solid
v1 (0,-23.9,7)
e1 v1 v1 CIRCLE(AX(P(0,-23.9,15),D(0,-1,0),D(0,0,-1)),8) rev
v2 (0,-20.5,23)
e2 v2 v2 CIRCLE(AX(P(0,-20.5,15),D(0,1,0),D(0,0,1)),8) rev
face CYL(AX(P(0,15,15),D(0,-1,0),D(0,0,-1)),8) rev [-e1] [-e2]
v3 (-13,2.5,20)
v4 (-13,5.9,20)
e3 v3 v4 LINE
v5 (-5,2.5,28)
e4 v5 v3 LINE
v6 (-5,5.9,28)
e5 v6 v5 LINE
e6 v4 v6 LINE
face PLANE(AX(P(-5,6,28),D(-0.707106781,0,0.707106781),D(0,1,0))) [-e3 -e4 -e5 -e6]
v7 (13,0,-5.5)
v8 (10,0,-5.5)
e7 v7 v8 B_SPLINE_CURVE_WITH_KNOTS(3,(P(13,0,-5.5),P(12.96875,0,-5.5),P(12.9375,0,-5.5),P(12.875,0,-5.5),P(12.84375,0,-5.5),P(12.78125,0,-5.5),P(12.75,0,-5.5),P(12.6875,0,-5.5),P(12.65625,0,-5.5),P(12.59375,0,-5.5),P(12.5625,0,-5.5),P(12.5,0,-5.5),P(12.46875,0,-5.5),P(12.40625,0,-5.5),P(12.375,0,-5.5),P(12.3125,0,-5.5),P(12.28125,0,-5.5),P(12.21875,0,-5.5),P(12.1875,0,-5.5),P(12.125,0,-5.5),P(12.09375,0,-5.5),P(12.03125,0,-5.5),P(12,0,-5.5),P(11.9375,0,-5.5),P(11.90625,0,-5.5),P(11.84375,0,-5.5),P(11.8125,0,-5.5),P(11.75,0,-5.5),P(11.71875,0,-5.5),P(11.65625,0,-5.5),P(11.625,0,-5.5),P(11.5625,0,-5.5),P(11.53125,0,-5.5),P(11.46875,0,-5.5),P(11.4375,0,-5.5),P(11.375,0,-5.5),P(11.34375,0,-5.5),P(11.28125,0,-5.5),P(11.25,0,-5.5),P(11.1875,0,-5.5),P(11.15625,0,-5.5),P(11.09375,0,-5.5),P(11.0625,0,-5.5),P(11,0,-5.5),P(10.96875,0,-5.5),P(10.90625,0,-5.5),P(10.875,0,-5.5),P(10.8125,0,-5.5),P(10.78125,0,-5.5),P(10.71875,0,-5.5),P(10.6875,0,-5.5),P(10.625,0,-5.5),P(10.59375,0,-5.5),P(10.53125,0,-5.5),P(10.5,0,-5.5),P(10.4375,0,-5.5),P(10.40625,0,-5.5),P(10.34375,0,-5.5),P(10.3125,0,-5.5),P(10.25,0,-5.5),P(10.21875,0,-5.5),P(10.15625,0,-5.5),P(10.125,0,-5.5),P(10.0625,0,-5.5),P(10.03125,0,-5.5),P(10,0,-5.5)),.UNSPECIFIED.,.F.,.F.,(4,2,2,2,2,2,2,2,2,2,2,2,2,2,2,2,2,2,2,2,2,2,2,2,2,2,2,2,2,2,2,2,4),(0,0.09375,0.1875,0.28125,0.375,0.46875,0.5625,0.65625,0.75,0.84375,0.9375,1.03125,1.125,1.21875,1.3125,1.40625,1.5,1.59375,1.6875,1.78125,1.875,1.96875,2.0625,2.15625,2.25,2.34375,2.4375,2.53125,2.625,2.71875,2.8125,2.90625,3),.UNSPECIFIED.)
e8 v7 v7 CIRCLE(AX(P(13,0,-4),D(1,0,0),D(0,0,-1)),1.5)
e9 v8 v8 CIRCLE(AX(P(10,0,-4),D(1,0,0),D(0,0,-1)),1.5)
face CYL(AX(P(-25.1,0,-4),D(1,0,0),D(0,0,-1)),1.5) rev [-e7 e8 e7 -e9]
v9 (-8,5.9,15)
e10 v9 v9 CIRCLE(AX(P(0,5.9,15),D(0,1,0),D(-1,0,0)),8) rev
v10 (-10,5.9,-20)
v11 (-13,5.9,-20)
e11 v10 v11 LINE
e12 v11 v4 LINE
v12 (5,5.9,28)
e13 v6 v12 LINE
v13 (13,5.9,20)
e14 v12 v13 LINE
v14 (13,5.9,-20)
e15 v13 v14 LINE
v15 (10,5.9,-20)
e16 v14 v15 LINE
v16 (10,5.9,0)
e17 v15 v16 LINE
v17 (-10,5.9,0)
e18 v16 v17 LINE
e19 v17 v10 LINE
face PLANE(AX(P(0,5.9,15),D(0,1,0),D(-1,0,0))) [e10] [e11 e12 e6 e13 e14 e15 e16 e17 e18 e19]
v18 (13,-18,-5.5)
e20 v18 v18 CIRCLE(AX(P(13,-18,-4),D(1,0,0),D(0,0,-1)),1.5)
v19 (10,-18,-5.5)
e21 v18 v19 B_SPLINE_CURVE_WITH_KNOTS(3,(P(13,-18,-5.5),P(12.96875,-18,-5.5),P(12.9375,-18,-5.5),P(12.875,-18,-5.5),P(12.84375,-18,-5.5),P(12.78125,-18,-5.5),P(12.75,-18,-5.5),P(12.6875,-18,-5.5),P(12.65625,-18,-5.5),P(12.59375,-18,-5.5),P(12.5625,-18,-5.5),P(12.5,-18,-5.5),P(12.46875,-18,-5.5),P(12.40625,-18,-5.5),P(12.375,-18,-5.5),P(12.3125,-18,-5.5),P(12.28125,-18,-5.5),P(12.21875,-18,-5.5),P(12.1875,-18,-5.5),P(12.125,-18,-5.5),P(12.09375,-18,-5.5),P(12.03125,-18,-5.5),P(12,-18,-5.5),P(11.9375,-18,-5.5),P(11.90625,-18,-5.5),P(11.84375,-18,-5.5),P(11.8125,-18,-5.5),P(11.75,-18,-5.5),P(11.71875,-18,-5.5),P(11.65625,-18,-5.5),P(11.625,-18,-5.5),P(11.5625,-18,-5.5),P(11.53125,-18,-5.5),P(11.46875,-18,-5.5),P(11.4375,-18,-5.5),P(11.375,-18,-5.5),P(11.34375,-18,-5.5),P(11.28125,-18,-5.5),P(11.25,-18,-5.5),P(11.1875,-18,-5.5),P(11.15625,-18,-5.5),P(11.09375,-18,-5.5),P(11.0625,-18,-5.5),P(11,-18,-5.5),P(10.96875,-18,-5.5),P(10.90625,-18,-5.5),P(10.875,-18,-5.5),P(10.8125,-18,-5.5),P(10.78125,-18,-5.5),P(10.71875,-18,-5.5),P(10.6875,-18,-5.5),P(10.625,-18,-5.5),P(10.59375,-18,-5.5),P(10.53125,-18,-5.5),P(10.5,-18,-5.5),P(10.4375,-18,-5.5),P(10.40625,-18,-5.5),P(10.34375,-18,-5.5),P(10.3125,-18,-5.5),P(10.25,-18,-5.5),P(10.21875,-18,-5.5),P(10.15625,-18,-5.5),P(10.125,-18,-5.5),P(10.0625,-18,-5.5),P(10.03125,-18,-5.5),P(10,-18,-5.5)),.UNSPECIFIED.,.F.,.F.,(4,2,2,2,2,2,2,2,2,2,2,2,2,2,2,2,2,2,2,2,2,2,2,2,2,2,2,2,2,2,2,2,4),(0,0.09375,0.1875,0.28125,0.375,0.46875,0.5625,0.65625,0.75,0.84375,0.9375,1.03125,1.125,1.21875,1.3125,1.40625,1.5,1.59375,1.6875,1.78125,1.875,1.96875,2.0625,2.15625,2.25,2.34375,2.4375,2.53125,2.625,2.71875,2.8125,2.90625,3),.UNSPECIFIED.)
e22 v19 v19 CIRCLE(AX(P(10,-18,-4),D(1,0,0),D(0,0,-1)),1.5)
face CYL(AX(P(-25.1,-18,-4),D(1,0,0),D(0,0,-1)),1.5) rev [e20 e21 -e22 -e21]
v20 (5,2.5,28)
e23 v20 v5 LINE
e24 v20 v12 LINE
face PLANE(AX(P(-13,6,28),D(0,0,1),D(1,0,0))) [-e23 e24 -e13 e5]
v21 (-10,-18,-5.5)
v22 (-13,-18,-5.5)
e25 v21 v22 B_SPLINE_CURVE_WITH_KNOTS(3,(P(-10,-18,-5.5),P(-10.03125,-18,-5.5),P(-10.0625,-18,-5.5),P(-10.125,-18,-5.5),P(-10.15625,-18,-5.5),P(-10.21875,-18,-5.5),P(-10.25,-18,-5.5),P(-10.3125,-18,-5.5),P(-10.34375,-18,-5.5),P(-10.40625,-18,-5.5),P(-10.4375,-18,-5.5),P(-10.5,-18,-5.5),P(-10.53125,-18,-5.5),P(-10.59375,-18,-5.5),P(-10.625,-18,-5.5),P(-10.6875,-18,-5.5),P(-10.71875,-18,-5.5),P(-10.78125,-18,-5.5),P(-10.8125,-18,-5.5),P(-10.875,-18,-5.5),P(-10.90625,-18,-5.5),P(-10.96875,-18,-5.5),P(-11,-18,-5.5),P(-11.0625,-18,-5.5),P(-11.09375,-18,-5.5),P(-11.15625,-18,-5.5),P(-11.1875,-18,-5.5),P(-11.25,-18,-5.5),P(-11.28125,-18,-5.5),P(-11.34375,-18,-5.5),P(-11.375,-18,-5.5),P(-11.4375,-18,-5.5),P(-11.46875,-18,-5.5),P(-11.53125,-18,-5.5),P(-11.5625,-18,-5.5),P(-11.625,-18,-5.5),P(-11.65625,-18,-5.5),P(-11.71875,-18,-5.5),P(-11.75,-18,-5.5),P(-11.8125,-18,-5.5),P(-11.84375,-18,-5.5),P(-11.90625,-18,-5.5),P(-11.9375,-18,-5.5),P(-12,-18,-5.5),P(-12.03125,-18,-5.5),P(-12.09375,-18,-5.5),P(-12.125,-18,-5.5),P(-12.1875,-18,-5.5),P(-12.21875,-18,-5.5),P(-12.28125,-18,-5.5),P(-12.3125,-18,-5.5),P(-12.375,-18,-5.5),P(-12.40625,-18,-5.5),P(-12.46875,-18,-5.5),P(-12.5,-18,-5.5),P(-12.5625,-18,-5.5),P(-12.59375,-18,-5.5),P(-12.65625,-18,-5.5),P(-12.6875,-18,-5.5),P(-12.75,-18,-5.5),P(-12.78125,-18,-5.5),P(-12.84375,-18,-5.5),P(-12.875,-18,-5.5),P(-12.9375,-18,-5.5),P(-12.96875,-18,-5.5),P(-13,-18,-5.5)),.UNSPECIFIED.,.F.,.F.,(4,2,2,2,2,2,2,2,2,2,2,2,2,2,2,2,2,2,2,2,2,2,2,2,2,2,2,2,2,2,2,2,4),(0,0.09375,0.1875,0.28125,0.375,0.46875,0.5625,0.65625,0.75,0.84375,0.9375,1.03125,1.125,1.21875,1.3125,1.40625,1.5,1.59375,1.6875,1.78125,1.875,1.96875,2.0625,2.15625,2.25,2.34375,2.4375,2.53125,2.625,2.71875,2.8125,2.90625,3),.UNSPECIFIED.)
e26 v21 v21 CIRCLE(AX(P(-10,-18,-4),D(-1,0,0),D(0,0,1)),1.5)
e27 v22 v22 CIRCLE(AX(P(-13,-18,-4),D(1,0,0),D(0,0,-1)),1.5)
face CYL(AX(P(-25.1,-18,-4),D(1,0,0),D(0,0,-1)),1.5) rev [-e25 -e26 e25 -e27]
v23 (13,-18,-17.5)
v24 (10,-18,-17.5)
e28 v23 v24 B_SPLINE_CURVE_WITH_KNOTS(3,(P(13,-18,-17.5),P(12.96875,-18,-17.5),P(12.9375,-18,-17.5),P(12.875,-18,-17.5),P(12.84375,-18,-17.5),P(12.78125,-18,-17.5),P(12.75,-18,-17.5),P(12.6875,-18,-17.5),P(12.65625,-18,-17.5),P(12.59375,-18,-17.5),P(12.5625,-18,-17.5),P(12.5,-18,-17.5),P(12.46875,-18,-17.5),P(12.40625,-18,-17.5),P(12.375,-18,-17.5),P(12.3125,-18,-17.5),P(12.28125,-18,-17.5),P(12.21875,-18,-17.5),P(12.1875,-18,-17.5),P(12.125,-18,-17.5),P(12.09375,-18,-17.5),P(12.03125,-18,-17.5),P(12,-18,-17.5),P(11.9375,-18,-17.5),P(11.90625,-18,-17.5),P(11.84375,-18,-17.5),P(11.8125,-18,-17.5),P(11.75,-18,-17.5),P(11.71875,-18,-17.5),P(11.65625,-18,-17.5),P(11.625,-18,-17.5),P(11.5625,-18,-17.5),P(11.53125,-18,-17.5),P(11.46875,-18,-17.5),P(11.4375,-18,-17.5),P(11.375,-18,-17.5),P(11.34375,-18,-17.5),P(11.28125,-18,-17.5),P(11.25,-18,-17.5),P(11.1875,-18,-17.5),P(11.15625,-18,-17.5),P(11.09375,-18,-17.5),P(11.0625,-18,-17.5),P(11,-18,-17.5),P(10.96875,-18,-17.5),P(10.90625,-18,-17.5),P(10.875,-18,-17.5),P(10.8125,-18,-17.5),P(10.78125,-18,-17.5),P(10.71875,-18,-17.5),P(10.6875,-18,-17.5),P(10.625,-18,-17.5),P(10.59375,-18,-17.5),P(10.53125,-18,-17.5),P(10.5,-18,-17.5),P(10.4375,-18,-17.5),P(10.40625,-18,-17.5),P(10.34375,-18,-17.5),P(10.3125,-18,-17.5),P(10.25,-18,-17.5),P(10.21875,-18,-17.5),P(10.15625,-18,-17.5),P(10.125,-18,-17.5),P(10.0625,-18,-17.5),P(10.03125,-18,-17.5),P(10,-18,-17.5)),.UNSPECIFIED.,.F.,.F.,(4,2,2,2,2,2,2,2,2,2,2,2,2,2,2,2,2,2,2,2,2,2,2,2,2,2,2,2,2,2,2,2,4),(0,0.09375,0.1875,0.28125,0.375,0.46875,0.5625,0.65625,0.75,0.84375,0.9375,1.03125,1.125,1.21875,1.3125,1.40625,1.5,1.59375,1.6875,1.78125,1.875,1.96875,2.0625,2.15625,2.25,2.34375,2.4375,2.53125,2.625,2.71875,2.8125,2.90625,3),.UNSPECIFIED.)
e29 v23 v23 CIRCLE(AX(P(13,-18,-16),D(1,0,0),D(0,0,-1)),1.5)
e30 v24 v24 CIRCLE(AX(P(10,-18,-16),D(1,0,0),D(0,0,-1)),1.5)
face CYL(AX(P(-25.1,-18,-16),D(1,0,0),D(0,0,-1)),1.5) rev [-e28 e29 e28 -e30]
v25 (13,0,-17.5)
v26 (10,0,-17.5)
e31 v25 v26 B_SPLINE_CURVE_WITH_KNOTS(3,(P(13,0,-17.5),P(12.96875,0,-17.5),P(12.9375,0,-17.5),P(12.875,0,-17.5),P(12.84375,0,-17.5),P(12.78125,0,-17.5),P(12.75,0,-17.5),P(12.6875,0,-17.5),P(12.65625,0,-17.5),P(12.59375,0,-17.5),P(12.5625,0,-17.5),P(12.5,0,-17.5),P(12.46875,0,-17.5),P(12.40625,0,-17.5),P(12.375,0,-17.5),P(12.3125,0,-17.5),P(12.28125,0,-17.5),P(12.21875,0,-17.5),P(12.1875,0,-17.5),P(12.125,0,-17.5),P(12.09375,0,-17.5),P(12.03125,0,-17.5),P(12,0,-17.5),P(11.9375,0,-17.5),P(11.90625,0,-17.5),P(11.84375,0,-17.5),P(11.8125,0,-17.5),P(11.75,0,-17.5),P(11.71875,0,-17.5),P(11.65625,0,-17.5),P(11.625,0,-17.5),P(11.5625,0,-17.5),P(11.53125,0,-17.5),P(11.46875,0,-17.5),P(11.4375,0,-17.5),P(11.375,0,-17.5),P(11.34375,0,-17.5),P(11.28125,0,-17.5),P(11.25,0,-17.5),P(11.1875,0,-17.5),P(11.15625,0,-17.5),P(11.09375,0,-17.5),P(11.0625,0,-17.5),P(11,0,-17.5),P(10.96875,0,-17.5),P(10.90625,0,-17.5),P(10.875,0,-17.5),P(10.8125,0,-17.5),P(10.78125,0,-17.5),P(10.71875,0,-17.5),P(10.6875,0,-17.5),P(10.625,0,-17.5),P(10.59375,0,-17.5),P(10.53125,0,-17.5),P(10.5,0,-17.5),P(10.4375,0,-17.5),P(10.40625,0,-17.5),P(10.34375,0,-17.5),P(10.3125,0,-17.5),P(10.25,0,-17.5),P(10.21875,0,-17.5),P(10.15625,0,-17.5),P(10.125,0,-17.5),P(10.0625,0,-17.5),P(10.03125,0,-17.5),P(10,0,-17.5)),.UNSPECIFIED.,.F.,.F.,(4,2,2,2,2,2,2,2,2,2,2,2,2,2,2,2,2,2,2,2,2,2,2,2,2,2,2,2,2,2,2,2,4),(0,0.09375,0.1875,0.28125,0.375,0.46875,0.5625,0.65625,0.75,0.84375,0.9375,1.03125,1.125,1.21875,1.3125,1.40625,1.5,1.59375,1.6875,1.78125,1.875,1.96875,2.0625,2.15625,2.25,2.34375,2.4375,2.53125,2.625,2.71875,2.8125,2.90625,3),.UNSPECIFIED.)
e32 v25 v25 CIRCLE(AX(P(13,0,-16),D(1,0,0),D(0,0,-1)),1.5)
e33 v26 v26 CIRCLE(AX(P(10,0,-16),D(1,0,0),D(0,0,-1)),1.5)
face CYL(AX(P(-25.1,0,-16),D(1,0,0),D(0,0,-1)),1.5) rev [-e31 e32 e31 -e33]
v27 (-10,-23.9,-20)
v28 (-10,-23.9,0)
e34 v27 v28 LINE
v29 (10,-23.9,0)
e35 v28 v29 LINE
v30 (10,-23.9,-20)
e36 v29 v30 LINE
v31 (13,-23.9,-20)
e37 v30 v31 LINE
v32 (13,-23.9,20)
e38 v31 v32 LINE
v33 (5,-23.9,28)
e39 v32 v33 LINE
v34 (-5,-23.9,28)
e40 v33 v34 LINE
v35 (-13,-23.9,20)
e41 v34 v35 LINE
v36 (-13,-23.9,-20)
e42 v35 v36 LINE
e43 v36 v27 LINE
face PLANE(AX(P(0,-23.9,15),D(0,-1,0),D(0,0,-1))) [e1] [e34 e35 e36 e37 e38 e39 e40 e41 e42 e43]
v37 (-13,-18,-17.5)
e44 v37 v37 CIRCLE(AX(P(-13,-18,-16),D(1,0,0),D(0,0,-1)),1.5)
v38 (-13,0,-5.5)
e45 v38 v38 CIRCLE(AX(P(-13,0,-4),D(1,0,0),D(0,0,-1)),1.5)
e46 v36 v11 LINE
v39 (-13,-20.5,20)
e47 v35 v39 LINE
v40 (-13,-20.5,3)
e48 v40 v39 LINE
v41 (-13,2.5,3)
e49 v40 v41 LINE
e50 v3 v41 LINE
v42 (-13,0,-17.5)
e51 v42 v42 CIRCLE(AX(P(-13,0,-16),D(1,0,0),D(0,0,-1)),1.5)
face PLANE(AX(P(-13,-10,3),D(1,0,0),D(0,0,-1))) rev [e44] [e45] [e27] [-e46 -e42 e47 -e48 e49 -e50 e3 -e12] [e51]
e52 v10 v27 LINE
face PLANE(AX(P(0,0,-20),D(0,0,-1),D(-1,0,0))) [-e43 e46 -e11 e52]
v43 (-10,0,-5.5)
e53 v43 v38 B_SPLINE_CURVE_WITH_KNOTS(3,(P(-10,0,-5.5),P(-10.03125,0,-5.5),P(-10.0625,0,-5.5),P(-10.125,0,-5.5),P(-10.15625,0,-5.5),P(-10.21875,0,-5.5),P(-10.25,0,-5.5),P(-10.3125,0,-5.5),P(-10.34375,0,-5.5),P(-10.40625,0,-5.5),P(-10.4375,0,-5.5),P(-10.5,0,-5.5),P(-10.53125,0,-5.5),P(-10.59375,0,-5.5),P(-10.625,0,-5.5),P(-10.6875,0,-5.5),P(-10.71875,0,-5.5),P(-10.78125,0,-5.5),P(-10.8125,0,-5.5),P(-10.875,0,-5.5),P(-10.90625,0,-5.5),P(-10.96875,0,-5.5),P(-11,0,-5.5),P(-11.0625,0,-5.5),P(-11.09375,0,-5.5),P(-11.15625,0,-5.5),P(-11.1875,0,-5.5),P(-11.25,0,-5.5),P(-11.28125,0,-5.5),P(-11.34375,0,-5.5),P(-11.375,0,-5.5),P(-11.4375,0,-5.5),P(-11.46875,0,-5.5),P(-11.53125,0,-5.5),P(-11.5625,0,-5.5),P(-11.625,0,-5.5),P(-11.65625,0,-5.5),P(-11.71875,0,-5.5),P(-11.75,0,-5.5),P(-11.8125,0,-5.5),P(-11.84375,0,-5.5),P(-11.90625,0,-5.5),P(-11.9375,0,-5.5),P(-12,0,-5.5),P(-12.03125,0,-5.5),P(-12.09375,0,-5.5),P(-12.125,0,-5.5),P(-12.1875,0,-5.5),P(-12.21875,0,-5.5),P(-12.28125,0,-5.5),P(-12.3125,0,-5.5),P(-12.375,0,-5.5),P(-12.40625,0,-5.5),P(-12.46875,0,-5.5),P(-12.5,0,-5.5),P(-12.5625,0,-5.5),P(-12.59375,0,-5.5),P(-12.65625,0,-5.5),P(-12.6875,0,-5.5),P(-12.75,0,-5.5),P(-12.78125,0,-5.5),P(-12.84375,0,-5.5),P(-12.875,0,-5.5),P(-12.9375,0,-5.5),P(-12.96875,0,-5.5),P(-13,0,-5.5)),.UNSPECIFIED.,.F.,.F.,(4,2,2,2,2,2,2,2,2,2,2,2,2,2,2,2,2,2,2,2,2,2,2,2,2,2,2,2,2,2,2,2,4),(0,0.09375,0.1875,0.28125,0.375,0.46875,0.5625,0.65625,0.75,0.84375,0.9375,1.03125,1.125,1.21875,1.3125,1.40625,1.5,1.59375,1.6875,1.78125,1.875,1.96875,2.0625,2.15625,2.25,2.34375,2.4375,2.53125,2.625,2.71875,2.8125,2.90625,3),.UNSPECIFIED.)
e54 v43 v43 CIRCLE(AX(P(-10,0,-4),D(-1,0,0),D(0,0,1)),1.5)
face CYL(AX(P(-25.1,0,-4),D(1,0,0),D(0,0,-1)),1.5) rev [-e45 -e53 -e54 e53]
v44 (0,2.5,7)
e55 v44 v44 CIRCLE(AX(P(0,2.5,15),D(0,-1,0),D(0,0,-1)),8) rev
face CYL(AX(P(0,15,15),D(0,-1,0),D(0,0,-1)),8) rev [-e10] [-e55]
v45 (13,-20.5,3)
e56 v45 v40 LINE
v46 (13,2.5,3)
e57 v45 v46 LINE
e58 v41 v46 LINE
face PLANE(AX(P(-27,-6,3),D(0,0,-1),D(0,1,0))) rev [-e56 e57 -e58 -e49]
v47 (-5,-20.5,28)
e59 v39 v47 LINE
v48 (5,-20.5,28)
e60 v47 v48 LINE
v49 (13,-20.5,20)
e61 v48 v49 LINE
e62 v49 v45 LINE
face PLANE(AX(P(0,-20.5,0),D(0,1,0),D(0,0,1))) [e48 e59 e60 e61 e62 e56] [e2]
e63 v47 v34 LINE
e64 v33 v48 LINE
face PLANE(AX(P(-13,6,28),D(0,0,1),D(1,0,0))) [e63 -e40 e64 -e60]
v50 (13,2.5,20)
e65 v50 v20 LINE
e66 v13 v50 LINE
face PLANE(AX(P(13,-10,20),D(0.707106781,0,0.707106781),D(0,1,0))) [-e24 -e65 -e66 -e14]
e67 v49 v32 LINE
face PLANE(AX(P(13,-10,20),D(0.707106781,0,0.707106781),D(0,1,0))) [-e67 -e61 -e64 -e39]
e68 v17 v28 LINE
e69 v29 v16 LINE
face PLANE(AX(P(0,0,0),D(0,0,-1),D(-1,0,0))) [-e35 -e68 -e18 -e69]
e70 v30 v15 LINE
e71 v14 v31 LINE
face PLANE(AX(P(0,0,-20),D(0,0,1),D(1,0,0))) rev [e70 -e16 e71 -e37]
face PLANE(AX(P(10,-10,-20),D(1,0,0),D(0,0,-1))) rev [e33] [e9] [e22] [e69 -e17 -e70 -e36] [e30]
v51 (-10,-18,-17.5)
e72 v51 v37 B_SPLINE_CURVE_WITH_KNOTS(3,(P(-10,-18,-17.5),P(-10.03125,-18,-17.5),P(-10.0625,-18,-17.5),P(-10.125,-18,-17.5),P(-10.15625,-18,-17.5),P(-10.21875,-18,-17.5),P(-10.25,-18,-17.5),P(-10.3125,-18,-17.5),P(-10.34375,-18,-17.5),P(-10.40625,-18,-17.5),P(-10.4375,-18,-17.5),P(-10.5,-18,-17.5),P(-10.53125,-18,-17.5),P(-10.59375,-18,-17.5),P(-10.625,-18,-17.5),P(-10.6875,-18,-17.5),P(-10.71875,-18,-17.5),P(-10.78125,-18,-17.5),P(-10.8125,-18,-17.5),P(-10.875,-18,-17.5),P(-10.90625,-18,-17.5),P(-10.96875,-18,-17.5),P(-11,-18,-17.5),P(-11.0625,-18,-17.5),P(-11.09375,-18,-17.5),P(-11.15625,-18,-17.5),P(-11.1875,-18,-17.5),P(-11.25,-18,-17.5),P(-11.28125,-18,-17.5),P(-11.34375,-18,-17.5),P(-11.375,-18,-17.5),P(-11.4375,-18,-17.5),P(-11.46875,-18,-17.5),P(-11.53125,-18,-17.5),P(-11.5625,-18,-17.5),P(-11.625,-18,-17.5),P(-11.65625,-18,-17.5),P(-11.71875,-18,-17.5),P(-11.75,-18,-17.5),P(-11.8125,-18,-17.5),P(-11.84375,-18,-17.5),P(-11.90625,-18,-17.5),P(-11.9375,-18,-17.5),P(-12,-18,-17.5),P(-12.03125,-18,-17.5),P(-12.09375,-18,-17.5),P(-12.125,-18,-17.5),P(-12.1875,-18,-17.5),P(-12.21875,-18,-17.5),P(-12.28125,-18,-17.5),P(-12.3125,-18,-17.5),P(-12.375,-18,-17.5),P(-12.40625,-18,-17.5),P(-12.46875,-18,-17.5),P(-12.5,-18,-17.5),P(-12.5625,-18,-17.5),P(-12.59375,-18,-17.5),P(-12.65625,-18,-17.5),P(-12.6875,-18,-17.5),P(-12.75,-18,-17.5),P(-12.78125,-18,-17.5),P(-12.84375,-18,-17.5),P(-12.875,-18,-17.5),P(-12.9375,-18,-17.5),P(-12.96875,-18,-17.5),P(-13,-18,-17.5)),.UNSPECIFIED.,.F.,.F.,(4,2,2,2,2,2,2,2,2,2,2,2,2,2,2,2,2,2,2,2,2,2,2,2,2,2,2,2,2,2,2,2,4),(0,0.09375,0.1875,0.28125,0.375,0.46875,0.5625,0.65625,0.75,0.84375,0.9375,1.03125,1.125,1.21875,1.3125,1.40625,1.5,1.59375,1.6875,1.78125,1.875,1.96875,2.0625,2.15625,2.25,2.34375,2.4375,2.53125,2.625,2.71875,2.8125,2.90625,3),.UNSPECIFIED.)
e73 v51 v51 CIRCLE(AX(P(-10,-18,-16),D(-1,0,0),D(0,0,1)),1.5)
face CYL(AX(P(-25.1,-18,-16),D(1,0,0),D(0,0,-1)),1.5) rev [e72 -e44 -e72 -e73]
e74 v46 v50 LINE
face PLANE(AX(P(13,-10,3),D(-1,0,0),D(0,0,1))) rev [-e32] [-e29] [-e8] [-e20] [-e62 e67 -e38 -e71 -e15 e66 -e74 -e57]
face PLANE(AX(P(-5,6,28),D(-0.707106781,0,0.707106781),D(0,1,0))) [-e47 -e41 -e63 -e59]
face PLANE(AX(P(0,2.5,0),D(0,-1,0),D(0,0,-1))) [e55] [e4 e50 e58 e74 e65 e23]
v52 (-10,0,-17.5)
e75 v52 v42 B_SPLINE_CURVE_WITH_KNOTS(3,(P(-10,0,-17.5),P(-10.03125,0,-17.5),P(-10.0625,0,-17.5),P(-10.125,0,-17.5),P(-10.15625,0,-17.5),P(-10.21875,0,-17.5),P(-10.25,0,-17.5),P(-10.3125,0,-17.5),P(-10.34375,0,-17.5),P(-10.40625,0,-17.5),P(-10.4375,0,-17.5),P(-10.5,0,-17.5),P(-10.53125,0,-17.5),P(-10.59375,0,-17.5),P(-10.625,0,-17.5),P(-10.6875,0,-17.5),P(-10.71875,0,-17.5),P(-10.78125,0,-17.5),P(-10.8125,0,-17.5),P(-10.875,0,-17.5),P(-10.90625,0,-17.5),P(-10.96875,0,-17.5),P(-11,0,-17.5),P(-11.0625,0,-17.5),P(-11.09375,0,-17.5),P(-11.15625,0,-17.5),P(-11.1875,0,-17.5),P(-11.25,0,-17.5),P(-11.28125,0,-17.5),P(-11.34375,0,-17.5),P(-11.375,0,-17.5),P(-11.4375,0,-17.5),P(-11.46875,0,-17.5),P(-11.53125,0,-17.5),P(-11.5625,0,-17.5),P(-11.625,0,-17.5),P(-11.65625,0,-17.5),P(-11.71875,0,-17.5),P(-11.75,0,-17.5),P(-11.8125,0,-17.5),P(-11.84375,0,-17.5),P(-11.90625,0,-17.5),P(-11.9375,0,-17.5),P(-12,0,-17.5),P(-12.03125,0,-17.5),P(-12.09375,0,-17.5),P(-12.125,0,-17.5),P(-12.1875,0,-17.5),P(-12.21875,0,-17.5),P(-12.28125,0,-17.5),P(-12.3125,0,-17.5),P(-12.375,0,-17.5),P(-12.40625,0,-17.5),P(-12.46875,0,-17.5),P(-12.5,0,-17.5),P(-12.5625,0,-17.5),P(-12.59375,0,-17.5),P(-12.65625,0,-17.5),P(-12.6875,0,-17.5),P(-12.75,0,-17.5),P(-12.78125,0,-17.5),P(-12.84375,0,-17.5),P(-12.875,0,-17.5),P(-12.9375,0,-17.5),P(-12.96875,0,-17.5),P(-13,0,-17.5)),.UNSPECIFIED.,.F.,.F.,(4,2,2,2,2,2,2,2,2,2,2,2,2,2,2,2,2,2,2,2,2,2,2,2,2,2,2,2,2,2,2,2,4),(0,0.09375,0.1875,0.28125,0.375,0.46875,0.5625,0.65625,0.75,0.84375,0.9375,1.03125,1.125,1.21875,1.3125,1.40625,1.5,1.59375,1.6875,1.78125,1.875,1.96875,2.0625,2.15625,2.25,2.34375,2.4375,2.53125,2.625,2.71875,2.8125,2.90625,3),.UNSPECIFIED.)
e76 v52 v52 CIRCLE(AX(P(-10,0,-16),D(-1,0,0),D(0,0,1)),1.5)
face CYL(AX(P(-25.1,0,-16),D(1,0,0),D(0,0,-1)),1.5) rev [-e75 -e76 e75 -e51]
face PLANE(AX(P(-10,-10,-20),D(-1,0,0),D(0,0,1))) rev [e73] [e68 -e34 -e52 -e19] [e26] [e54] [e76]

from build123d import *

# Parameters (mm, degrees)
SKETCH_1_W           = 26
SKETCH_1_H           = 20
EXTRUDE_1_DEPTH      = 3
EXTRUDE_2_DEPTH      = 16
SKETCH_5_W           = 3
SKETCH_5_H           = 20
EXTRUDE_3_DEPTH      = 20
SKETCH_8_W           = 23
SKETCH_8_H           = 8
CUT_EXTRUDE_5_DEPTH  = 40
CHAMFER_1_SIZE       = 8
SKETCH_16_W          = 23
SKETCH_16_H          = 4
CUT_EXTRUDE_8_DEPTH  = 26
SKETCH_17_W          = 16.892856711
SKETCH_17_H          = 8
CUT_EXTRUDE_9_DEPTH  = 10
EXTRUDE_4_DEPTH      = 14
CUT_EXTRUDE_10_DEPTH = 14
SKETCH_20_R          = 8
CUT_EXTRUDE_11_DEPTH = 39
SKETCH_21_R          = 9
CUT_EXTRUDE_12_DEPTH = 0.1
CUT_EXTRUDE_START    = -0.1
SKETCH_22_R          = 9
CUT_EXTRUDE_13_DEPTH = 0.1
SKETCH_23_R          = 1.5
CUT_EXTRUDE_14_DEPTH = 38.1
CUT_EXTRUDE_15_DEPTH = 0.5
CUT_EXTRUDE_16_DEPTH = 0.5
CUT_EXTRUDE_17_DEPTH = 0.1
CUT_EXTRUDE_18_DEPTH = 0.1


with BuildPart() as part:
    # 草图1 → 凸台-拉伸1 (new body)
    with BuildSketch(Plane.XY):
        Rectangle(SKETCH_1_W, SKETCH_1_H)
    extrude(amount=EXTRUDE_1_DEPTH)

    # 草图2 → 凸台-拉伸2 (add)
    with BuildSketch(Plane.XZ.offset(10)):
        Polygon((-13, 3), (-13, 15), (-13, 28), (13, 28), (13, 15), (13, 3), align=None)
    extrude(amount=-EXTRUDE_2_DEPTH)

    # 草图5 → 凸台-拉伸3 (add)
    with BuildSketch(Plane(origin=(0, 0, 0), x_dir=(-1, 0, 0), z_dir=(0, 0, -1))):
        with Locations((11.5, 0)):
            Rectangle(SKETCH_5_W, SKETCH_5_H)
        with Locations((-11.5, 0)):
            Rectangle(SKETCH_5_W, SKETCH_5_H)
    extrude(amount=EXTRUDE_3_DEPTH)

    # 草图8 → 切除-拉伸5 (cut)
    with BuildSketch(Plane(origin=(13, 0, 0), x_dir=(0, 0, -1), z_dir=(1, 0, 0))):
        with Locations((-14.5, -2)):
            Rectangle(SKETCH_8_W, SKETCH_8_H)
    extrude(amount=-CUT_EXTRUDE_5_DEPTH, mode=Mode.SUBTRACT)

    # 倒角1
    # the kernel refuses this chamfer: 8 mm, written as the material it takes off along each edge
    with BuildSketch(Plane(origin=(-13, -30.573463904, 28), x_dir=(-0.02749587661058627, 0, -0.9996219169112968), z_dir=(0, 1, 0)), Plane(origin=(13, -30.573463904, 28), x_dir=(-0.9996219169112968, 0, 0.027495876610586487), z_dir=(0, 1, 0))) as chamfer_1_piece_1:
        Polygon((CHAMFER_1_SIZE * 0.999621916911, -CHAMFER_1_SIZE * 0.0274958766106), (-CHAMFER_1_SIZE * 0.0274958766106, -CHAMFER_1_SIZE * 0.999621916911), (0, 0), align=None)
    extrude(amount=57.146927807, mode=Mode.SUBTRACT)

    # 草图16 → 切除-拉伸8 (cut)
    with BuildSketch(Plane(origin=(13, 0, 0), x_dir=(0, 0, -1), z_dir=(1, 0, 0))):
        with Locations((8.5, 8)):
            Rectangle(SKETCH_16_W, SKETCH_16_H)
    extrude(amount=-CUT_EXTRUDE_8_DEPTH, mode=Mode.SUBTRACT)

    # 草图17 → 切除-拉伸9 (cut)
    with BuildSketch(Plane.XY.offset(28)):
        with Locations((0.093159136, -2)):
            Rectangle(SKETCH_17_W, SKETCH_17_H)
    extrude(amount=-CUT_EXTRUDE_9_DEPTH, mode=Mode.SUBTRACT)

    # 草图18 → 凸台-拉伸4 (add)
    with BuildSketch(Plane.XZ.offset(10)):
        Polygon((5, 28), (-5, 28), (-13, 20), (-13, -20), (-10, -20), (-10, 0), (10, 0), (10, -20), (13, -20), (13, 20), align=None)
    extrude(amount=EXTRUDE_4_DEPTH)

    # 草图19 → 切除-拉伸10 (cut)
    with BuildSketch(Plane(origin=(0, -6, 0), x_dir=(1, 0, 0), z_dir=(0, 1, 0))):
        Polygon((5, -28), (13, -20), (13, -3), (-13, -3), (-13, -20), (-5, -28), align=None)
    extrude(amount=-CUT_EXTRUDE_10_DEPTH, mode=Mode.SUBTRACT)

    # 草图20 → 切除-拉伸11 (cut)
    with BuildSketch(Plane.XZ.offset(24)):
        with Locations(Location((0, 15, 0), (0, 0, 270))):
            Circle(SKETCH_20_R)
    extrude(amount=-CUT_EXTRUDE_11_DEPTH, mode=Mode.SUBTRACT)

    # 草图21 → 切除-拉伸12 (cut)
    with BuildSketch(Plane.XZ.offset(24)):
        with Locations(Location((0, 15, 0), (0, 0, 270))):
            Circle(SKETCH_21_R)
    extrude(amount=-CUT_EXTRUDE_12_DEPTH, mode=Mode.SUBTRACT)

    # 草图22 → 切除-拉伸13 (cut)
    with BuildSketch(Plane(origin=(0, 6, 0), x_dir=(1, 0, 0), z_dir=(0, 1, 0)).offset(CUT_EXTRUDE_START)):
        with Locations(Location((0, -15, 0), (0, 0, 90))):
            Circle(SKETCH_22_R)
    extrude(amount=CUT_EXTRUDE_13_DEPTH, mode=Mode.SUBTRACT)

    # 草图23 → 切除-拉伸14 (cut)
    with BuildSketch(Plane(origin=(13, 0, 0), x_dir=(0, 0, -1), z_dir=(1, 0, 0))):
        with Locations((4, 0)):
            Circle(SKETCH_23_R)
        with Locations((16, 0)):
            Circle(SKETCH_23_R)
        with Locations((4, -18)):
            Circle(SKETCH_23_R)
        with Locations((16, -18)):
            Circle(SKETCH_23_R)
    extrude(amount=-CUT_EXTRUDE_14_DEPTH, mode=Mode.SUBTRACT)

    # 草图24 → 切除-拉伸15 (cut)
    with BuildSketch(Plane.XZ.offset(-2)):
        Polygon((-5, 28), (-13, 20), (-13, 3), (13, 3), (13, 20), (5, 28), align=None)
    extrude(amount=-CUT_EXTRUDE_15_DEPTH, mode=Mode.SUBTRACT)

    # 草图25 → 切除-拉伸16 (cut)
    with BuildSketch(Plane(origin=(0, -20, 0), x_dir=(1, 0, 0), z_dir=(0, 1, 0))):
        Polygon((-5, -28), (5, -28), (13, -20), (13, -3), (-13, -3), (-13, -20), align=None)
    extrude(amount=-CUT_EXTRUDE_16_DEPTH, mode=Mode.SUBTRACT)

    # 草图26 → 切除-拉伸17 (cut)
    with BuildSketch(Plane.XZ.offset(24)):
        Polygon((13, 20), (5, 28), (-5, 28), (-13, 20), (-13, -20), (-10, -20), (-10, 0), (10, 0), (10, -20), (13, -20), align=None)
    extrude(amount=-CUT_EXTRUDE_17_DEPTH, mode=Mode.SUBTRACT)

    # 草图27 → 切除-拉伸18 (cut)
    with BuildSketch(Plane(origin=(0, 6, 0), x_dir=(1, 0, 0), z_dir=(0, 1, 0))):
        Polygon((-13, 20), (-13, -20), (-5, -28), (5, -28), (13, -20), (13, 20), (10, 20), (10, 0), (-10, 0), (-10, 20), align=None)
    extrude(amount=-CUT_EXTRUDE_18_DEPTH, mode=Mode.SUBTRACT)


solid = part.part
